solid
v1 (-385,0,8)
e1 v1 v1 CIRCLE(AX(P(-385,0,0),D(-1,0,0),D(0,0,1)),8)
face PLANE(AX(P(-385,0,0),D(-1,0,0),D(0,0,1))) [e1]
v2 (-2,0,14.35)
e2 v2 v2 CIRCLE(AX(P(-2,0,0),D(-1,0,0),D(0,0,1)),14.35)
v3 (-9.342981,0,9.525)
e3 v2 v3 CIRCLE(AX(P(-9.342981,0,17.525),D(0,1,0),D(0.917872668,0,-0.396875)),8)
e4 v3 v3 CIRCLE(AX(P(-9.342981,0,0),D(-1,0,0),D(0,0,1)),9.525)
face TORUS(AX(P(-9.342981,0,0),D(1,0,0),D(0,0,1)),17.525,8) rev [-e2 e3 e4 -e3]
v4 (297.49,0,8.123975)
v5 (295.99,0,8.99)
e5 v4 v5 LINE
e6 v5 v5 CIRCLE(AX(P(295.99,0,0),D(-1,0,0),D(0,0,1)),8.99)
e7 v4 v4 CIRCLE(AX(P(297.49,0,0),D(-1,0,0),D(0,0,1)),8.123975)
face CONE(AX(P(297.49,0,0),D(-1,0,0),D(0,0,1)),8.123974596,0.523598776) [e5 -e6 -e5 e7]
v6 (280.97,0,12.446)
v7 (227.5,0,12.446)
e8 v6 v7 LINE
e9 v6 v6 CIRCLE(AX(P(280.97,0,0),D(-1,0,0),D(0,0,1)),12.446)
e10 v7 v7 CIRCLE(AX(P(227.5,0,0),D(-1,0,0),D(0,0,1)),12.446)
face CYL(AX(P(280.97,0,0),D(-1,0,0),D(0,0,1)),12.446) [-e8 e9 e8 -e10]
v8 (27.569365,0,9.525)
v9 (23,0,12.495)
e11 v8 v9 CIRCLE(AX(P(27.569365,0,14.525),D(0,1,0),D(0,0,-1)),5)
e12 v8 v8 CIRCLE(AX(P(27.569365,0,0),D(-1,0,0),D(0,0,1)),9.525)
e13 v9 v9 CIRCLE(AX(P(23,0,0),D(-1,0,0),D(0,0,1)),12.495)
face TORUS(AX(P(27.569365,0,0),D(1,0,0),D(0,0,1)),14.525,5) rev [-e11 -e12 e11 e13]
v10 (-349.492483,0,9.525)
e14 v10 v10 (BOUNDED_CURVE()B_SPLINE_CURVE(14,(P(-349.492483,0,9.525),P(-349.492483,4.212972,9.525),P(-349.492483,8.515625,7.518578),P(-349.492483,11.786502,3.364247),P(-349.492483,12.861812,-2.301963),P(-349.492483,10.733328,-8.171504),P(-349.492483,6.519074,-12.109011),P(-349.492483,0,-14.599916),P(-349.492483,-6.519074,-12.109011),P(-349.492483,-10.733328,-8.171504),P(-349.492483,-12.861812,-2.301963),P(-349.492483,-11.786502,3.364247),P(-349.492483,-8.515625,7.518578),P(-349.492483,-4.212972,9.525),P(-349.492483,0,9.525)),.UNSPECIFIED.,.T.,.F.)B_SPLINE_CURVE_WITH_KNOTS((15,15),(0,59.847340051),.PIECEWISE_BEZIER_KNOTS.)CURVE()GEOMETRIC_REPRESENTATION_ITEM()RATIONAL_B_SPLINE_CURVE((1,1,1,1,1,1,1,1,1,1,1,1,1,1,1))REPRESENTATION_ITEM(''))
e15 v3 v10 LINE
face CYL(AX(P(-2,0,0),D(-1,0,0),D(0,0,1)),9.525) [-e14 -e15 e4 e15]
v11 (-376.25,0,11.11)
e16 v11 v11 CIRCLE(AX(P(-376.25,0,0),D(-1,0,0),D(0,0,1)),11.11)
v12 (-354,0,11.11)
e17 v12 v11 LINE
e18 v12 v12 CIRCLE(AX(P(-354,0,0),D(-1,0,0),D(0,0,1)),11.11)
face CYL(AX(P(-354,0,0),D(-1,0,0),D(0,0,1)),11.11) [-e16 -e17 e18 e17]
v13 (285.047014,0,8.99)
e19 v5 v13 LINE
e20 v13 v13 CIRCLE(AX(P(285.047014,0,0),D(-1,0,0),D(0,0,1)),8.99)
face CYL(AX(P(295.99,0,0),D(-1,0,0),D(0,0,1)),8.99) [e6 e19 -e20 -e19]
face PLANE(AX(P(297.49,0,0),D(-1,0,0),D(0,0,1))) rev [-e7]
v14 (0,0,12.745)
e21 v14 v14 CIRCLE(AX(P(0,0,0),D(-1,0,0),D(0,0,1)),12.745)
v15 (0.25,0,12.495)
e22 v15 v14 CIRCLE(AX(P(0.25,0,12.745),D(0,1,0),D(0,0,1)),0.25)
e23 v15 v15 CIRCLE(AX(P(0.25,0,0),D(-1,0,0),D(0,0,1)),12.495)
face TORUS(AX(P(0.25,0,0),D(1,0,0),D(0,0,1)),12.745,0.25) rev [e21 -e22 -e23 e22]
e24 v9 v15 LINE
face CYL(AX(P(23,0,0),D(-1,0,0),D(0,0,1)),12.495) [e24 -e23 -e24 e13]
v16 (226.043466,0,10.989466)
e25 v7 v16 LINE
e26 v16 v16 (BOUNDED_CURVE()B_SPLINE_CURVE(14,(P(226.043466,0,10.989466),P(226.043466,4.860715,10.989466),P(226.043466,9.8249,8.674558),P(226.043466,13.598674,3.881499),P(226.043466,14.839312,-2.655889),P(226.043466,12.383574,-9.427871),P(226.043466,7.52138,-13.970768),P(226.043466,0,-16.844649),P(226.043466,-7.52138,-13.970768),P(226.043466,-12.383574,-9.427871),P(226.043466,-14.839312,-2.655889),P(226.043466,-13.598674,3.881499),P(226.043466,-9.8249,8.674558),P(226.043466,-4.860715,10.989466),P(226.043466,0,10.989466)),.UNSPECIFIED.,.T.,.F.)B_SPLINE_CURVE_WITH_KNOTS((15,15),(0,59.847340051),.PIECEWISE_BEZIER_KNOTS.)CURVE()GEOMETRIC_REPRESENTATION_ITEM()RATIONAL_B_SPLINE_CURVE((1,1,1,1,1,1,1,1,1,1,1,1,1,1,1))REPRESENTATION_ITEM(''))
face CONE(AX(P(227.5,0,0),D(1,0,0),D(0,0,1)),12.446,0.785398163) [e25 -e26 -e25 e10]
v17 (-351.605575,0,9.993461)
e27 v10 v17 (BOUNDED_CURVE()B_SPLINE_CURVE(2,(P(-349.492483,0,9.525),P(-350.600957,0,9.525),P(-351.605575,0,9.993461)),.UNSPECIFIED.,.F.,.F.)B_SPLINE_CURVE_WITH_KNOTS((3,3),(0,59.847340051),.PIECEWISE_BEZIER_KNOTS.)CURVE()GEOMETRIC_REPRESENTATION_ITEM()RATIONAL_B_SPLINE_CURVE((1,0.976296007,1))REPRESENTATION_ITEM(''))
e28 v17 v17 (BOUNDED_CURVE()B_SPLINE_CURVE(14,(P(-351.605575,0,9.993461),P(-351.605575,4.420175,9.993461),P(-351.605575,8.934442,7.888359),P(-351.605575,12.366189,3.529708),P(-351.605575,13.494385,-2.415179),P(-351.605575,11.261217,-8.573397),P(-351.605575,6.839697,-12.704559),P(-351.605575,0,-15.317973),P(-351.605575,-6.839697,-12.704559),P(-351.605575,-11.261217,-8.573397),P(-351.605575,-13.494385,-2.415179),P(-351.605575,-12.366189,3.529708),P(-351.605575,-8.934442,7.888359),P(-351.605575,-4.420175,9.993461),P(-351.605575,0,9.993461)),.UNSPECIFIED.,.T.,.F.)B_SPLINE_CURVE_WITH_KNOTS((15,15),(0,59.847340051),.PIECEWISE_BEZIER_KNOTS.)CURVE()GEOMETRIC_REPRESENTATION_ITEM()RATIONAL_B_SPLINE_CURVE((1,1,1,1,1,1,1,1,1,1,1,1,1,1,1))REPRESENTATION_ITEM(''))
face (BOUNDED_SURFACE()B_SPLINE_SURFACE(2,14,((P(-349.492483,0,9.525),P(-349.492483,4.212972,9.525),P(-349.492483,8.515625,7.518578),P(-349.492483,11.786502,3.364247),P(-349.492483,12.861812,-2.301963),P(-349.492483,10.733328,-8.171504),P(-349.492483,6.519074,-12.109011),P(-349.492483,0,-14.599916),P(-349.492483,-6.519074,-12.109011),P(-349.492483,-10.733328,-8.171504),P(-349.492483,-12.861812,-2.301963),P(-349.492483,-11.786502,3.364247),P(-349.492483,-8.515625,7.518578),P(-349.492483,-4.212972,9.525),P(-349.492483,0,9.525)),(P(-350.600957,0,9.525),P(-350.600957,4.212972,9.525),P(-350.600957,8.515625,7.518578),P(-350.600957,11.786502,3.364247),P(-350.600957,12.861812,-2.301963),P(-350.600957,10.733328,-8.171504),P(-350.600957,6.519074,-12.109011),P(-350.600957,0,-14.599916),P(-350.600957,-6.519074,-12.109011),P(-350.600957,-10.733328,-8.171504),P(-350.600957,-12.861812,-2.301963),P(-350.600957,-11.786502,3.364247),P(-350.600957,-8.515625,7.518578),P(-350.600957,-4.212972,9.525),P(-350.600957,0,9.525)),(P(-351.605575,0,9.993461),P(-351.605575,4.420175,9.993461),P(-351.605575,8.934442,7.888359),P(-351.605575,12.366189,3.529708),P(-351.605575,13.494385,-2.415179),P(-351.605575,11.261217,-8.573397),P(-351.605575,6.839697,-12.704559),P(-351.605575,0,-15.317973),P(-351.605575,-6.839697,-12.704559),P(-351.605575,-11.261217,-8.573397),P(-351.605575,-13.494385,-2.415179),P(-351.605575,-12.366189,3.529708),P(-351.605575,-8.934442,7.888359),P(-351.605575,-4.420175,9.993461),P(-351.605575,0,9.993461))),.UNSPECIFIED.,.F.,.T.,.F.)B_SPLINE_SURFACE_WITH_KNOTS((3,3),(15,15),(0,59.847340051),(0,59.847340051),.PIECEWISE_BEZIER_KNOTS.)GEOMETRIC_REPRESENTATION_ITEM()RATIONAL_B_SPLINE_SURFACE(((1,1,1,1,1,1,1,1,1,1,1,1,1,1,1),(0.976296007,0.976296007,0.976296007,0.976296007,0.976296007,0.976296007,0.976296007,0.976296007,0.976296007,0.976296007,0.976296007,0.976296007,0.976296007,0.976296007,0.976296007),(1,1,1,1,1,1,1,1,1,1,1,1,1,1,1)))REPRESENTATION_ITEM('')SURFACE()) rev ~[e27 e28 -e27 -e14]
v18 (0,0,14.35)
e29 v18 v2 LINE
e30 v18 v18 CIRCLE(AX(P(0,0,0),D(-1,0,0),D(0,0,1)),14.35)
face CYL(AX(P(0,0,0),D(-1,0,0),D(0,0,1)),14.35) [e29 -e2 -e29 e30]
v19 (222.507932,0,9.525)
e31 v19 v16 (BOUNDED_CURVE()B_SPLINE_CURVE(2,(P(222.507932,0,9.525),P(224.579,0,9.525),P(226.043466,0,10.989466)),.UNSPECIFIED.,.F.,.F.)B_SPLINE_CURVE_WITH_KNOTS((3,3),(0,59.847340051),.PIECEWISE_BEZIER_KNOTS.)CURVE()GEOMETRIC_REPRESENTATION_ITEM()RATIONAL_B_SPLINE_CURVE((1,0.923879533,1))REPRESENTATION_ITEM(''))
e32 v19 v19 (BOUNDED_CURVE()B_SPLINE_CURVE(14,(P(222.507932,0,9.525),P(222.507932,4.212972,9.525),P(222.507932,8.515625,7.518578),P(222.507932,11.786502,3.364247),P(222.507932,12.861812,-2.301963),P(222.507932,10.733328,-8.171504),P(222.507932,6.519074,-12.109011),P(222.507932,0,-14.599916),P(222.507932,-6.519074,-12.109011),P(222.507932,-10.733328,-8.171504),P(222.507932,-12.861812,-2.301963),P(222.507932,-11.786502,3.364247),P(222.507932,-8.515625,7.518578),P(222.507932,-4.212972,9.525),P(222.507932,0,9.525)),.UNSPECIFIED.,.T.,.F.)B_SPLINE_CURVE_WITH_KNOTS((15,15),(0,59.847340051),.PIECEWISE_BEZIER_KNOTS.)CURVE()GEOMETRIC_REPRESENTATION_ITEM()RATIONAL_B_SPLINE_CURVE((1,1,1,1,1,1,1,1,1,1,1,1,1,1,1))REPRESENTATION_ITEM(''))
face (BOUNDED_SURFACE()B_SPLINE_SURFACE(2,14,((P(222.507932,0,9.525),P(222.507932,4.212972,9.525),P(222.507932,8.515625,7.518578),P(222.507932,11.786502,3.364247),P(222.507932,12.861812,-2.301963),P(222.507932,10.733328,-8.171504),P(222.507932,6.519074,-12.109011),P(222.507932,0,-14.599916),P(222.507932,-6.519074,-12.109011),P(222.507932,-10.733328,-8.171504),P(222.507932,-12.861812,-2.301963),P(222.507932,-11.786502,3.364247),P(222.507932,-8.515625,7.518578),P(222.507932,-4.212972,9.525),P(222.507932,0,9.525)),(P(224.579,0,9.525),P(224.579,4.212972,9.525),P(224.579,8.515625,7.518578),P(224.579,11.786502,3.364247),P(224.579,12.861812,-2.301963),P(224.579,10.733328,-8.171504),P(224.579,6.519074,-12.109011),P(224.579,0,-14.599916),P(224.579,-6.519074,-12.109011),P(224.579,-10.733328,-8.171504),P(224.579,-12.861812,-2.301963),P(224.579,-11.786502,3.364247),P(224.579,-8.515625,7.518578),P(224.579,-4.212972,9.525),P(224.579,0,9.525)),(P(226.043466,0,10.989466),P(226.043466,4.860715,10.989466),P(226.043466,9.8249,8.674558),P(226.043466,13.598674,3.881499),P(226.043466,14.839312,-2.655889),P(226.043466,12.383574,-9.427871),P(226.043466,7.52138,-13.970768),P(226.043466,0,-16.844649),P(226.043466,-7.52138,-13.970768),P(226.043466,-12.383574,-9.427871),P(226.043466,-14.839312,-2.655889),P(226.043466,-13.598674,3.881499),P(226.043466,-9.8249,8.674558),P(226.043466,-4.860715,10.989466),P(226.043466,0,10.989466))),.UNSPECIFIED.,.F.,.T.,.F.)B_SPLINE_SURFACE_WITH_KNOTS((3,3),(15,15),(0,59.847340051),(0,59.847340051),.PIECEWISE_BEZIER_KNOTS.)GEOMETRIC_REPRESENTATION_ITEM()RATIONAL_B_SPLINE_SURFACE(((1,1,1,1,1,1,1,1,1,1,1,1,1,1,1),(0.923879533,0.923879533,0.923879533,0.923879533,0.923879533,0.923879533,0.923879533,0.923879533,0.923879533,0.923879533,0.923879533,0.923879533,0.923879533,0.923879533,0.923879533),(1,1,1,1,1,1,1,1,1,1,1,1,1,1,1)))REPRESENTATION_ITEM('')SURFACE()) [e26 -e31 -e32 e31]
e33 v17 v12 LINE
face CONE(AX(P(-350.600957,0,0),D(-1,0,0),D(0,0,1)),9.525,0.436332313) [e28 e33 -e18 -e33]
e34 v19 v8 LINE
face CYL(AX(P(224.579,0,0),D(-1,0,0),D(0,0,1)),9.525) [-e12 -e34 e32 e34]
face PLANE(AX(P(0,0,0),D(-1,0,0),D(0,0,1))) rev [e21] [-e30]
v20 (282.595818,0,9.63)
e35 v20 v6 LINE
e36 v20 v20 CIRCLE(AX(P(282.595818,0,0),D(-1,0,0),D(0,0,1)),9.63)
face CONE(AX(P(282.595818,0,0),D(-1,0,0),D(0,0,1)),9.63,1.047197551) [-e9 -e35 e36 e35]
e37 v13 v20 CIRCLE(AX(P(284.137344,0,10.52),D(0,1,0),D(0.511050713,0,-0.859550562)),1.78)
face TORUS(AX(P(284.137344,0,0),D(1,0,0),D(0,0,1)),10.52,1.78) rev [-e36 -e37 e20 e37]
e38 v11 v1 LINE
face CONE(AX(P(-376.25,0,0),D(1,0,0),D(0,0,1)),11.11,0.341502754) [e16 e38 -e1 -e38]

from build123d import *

# Parameters (mm, degrees)
F4_R = 0.25
F5_R = 5
F6_R = 5


# Not quite as in the source:
# - a fillet or chamfer that OpenCascade refuses, or shapes differently, is made with other operations: its cross-section is extruded or revolved along the edge and cut away or added


with BuildPart() as f1:
    # F0 (on Front) → F1 (revolve)
    with BuildSketch(Plane.XZ):
        with BuildLine():
            Line((-2, 9.525), (-350.6009565311, 9.525))
            Line((-350.6009565311, 9.525), (-354, 11.11))
            Line((-354, 11.11), (-376.25, 11.11))
            Line((-376.25, 11.11), (-385, 8))
            Line((-385, 8), (-385, 0))
            Line((-385, 0), (297.49, 0))
            Line((297.49, 0), (297.49, 8.1239745962))
            Line((297.49, 8.1239745962), (295.99, 8.99))
            Line((295.99, 8.99), (285.0470138467, 8.99))
            ThreePointArc((285.0470138467, 8.99), (283.6876657265, 8.797737003), (282.5958183581, 9.63))
            Line((282.5958183581, 9.63), (280.97, 12.446))
            Line((280.97, 12.446), (227.5, 12.446))
            Line((227.5, 12.446), (224.579, 9.525))
            Line((224.579, 9.525), (23, 9.525))
            Line((23, 9.525), (23, 12.495))
            Line((23, 12.495), (0, 12.495))
            Line((0, 12.495), (0, 14.35))
            Line((0, 14.35), (-2, 14.35))
            Line((-2, 14.35), (-2, 9.525))
        make_face()
    revolve(axis=Axis((-43.755, 0, 0), (-1, 0, 0)))

    # F2: fillet of radius 8 on 1 edges, made by hand

    # F2_s1 → F2_t2 (revolve)
    with BuildSketch(Plane.XZ):
        with BuildLine():
            ThreePointArc((-2, 14.35), (-4.9498048155, 10.8391941398), (-9.3429813428, 9.525))
            Line((-9.3429813428, 9.525), (-2, 9.525))
            Line((-2, 9.525), (-2, 14.35))
        make_face()
    revolve(axis=Axis((-2, 0, 0), (-1, 0, 0)))

    # F3: fillet of radius 5 on 1 edges, made by hand

    # F3_s1 → F3_t2 (revolve)
    with BuildSketch(Plane.XZ):
        with BuildLine():
            ThreePointArc((27.5693653826, 9.525), (24.8444800639, 10.3327452367), (23, 12.495))
            Line((23, 12.495), (23, 9.525))
            Line((23, 9.525), (27.5693653826, 9.525))
        make_face()
    revolve(axis=Axis((23, 0, 0), (-1, 0, 0)))

    # F4
    f4_edges = [f1.edges().sort_by_distance(p)[0] for p in [
        (0, 0, -12.495),
    ]]
    fillet(f4_edges, radius=F4_R)

    # F5
    f5_edges = [f1.edges().sort_by_distance(p)[0] for p in [
        (-350.600957, 0, -9.525),
    ]]
    fillet(f5_edges, radius=F5_R)

    # F6
    f6_edges = [f1.edges().sort_by_distance(p)[0] for p in [
        (224.579, 0, -9.525),
    ]]
    fillet(f6_edges, radius=F6_R)


solid = f1.part
